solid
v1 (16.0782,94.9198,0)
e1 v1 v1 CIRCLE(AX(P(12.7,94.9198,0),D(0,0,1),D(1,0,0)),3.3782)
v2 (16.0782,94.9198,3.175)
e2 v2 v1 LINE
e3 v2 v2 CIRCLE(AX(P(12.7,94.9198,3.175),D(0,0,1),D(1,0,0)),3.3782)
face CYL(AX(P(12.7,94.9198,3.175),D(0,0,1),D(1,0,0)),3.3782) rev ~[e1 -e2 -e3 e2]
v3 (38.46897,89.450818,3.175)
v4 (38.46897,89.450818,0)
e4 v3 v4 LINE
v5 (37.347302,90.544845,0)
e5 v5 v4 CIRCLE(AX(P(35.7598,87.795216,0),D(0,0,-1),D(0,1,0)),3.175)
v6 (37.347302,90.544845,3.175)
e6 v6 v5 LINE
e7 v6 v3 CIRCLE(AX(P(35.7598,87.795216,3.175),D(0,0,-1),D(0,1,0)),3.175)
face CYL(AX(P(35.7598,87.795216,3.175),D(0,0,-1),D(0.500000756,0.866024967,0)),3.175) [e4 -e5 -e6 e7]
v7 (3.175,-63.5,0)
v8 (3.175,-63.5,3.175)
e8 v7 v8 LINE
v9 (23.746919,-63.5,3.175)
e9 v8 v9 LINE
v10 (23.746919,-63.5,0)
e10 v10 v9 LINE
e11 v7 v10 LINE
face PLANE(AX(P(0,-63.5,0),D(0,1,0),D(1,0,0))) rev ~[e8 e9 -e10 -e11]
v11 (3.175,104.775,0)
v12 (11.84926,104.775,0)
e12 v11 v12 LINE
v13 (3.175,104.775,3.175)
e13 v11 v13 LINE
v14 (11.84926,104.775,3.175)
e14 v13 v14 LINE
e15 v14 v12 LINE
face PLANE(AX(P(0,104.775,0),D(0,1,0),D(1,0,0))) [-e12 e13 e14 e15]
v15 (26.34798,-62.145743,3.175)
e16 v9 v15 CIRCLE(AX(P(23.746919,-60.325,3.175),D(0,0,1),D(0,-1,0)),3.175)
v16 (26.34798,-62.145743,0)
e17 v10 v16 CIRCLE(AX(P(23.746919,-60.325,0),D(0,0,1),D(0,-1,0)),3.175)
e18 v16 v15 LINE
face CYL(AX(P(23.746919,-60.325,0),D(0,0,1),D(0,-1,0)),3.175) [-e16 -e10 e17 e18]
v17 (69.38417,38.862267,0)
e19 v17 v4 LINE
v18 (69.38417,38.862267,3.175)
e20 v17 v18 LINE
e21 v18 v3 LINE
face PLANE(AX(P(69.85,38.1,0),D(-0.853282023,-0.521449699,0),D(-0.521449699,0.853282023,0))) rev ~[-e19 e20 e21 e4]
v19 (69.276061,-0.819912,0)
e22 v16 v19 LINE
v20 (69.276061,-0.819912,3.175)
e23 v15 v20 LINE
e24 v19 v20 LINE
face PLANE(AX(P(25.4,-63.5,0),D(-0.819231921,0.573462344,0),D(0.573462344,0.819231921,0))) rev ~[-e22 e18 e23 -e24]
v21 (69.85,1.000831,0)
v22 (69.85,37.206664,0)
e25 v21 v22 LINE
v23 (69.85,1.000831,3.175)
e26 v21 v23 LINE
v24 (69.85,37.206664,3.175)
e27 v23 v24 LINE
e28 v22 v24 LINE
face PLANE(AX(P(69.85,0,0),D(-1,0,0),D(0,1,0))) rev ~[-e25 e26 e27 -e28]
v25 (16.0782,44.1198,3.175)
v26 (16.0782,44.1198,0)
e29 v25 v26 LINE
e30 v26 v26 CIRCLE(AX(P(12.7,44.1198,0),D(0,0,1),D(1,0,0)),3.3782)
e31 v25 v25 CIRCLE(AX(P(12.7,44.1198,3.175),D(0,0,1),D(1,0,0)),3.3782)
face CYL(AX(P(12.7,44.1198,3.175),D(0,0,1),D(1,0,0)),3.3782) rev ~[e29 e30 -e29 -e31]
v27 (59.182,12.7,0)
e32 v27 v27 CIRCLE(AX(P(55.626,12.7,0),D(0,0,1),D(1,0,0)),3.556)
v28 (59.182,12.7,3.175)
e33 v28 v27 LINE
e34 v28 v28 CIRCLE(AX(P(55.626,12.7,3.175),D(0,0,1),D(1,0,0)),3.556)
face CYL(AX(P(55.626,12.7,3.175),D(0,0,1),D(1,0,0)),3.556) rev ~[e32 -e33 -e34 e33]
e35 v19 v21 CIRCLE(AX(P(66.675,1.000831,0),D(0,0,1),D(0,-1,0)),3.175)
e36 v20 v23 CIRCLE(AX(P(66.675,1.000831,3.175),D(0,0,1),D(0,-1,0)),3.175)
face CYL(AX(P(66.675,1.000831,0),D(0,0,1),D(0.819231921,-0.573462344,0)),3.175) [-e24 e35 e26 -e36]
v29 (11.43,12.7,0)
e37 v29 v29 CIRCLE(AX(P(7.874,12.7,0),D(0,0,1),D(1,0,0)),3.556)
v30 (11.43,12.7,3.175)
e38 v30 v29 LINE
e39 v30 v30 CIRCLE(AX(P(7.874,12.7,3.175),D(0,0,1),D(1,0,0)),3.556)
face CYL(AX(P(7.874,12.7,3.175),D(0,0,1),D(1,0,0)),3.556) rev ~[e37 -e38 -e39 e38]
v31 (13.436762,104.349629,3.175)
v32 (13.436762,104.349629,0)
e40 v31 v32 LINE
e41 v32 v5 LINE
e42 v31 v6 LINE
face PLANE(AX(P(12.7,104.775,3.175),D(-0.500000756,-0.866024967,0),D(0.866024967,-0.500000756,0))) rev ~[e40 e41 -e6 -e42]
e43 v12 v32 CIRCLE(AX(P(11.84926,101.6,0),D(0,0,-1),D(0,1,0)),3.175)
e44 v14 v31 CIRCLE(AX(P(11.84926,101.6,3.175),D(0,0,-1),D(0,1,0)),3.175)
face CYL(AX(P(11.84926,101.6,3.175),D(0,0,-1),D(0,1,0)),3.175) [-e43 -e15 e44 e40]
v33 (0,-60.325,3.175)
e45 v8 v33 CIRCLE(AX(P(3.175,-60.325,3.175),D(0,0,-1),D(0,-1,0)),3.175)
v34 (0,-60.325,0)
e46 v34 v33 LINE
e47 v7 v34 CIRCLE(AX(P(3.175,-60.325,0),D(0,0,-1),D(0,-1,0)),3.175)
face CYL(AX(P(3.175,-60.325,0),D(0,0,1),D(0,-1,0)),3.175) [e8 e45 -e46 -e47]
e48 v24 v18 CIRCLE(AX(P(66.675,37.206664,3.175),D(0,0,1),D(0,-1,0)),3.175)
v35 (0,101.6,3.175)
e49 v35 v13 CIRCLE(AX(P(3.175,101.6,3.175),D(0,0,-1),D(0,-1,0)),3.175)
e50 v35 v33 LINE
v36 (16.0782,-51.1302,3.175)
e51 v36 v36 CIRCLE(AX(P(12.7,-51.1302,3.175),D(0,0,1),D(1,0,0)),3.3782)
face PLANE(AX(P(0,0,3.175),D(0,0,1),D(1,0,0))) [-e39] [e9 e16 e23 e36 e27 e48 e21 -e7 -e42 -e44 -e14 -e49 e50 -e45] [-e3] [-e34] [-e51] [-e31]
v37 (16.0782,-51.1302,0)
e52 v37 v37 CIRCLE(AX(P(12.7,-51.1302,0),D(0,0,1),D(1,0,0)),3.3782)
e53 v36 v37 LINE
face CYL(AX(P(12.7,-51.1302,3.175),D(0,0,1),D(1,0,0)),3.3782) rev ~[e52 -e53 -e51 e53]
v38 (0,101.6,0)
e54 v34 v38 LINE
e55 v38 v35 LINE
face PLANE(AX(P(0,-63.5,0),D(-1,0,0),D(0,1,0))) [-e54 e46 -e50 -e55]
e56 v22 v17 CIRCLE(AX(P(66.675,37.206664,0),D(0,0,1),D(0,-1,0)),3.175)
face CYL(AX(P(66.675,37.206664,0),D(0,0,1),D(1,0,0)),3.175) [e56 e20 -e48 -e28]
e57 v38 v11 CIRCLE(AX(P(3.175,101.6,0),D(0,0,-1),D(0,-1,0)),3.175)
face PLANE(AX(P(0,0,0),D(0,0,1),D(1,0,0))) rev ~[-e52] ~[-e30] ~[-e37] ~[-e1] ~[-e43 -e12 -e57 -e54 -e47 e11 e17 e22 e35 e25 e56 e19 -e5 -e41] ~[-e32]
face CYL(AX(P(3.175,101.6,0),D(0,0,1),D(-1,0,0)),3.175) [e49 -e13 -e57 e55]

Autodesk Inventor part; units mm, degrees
ref_plane "YZ Plane" through (0, 0, 0) normal (1, 0, 0) x (0, 1, 0)
ref_plane "XZ Plane" through (0, 0, 0) normal (0, 1, 0) x (-1, 0, 0)
ref_plane "XY Plane" through (0, 0, 0) normal (0, 0, 1) x (1, 0, 0)
sketch "Sketch1" plane through (0, 0, 0) normal (0, 0, 1) x (1, 0, 0)
  line L0 (69.85, 0) -> (69.85, 38.1)
  line L1 (69.85, 38.1) -> (29.1042, 104.775)
  line L2 (0, 104.775) -> (0, 0)
  line L3 (0, -63.5) -> (0, 0)
  line L4 (0, 104.775) -> (29.1042, 104.775)
  line L5 (0, -63.5) -> (25.4, -63.5)
  line L6 (25.4, -63.5) -> (69.85, 0)
  dimension "d1" = 38.1
  dimension "d24" = 63.5
  dimension "d25" = 69.85
  dimension "d26" = 69.85
  dimension "d36" = 104.775
  dimension "d38" = 121.43
  dimension "d45" = 25.4
extrude "Extrusion1" add sketch "Sketch1" along normal blind 3.175
sketch "Sketch2" plane through (0, 0, 3.175) normal (0, 0, 1) x (1, 0, 0)
  line L0 (0, 0) -> (69.85, 0) projected
  line L1 (69.85, 0) -> (69.85, 38.1) projected
  line L2 (0, 104.775) -> (0, -63.5) projected
  circle A0 centre (7.874, 12.7) radius 3.556
  circle A1 centre (55.626, 12.7) radius 3.556
  point P0 (0, 152.4)
  dimension "d5" = 7.112
  dimension "d6" = 7.112
  dimension "d7" = 12.7
  dimension "d8" = 12.7
  dimension "d9" = 14.224
  dimension "d11" = 7.874
extrude "Extrusion2" cut sketch "Sketch2" against normal blind 25.4
sketch "Sketch3" plane through (0, 0, 3.175) normal (0, 0, 1) x (1, 0, 0)
  line L0 (0, 104.775) -> (0, -63.5) projected
  line L1 (0, 0) -> (69.85, 0) projected
  circle A0 centre (12.7, 94.9198) radius 3.3782
  circle A1 centre (12.7, 44.1198) radius 3.3782
  point P0 (0, 141.1158)
  dimension "d15" = 6.7564
  dimension "d16" = 6.7564
  dimension "d17" = 12.7
  dimension "d18" = 12.7
  dimension "d19" = 44.1198
  dimension "d20" = 50.8
extrude "Extrusion3" cut sketch "Sketch3" against normal blind 25.4
fillet "Fillet2" radius 3.175 2 edges at (69.85, 0, 1.5875) (69.85, 38.1, 1.5875)
fillet "Fillet3" radius 3.175 1 edges at (0, -63.5, 1.5875)
sketch "Sketch4" plane through (0, 0, 3.175) normal (0, 0, 1) x (1, 0, 0)
  line L0 (0, 104.775) -> (0, -60.325) projected
  circle A0 centre (12.7, 44.1198) radius 3.3782 projected
  circle A1 centre (12.7, -51.1302) radius 3.3782
  point P0 (0, 141.1158)
  point P1 (0, 0)
  dimension "d28" = 6.7564
  dimension "d29" = 95.25
  dimension "d30" = 12.7
extrude "Extrusion4" cut sketch "Sketch4" against normal blind 25.4 contours A1
sketch "Sketch5" plane through (0, 0, 3.175) normal (0, 0, 1) x (1, 0, 0)
  circle A0 centre (12.7, 44.1198) radius 3.3782 projected
  circle A1 centre (12.7, 94.9198) radius 3.3782 projected
  point P0 (0, 0)
extrude "Extrusion5" cut sketch "Sketch5" against normal blind 25.4
fillet "Fillet4" radius 3.175 2 edges at (29.1042, 104.775, 1.5875) (0, 104.775, 1.5875)
sketch "Sketch6" plane through (0, 0, 3.175) normal (0, 0, 1) x (1, 0, 0)
  line L0 (0, 101.6) -> (0, -60.325) projected
  line L1 (69.3842, 38.8623) -> (30.0327, 103.2556) projected
  arc A0 (30.0327, 103.2556) -> (27.3235, 104.775) centre (27.3235, 101.6) ccw projected
  line L2 (27.3235, 104.775) -> (3.175, 104.775) projected
  line L3 (12.7, 104.775) -> (38.0473, 90.1407)
  point P0 (0, 0)
  dimension "d40" = 30
  dimension "d41" = 12.7
extrude "Extrusion6" cut sketch "Sketch6" against normal blind 25.4
fillet "Fillet5" radius 3.175 2 edges at (12.7, 104.775, 1.5875) (38.0473, 90.1407, 1.5875)
fillet "Fillet6" radius 3.175 1 edges at (25.4, -63.5, 1.5875)
properties part number "Ninja left cylinder support bracket"
